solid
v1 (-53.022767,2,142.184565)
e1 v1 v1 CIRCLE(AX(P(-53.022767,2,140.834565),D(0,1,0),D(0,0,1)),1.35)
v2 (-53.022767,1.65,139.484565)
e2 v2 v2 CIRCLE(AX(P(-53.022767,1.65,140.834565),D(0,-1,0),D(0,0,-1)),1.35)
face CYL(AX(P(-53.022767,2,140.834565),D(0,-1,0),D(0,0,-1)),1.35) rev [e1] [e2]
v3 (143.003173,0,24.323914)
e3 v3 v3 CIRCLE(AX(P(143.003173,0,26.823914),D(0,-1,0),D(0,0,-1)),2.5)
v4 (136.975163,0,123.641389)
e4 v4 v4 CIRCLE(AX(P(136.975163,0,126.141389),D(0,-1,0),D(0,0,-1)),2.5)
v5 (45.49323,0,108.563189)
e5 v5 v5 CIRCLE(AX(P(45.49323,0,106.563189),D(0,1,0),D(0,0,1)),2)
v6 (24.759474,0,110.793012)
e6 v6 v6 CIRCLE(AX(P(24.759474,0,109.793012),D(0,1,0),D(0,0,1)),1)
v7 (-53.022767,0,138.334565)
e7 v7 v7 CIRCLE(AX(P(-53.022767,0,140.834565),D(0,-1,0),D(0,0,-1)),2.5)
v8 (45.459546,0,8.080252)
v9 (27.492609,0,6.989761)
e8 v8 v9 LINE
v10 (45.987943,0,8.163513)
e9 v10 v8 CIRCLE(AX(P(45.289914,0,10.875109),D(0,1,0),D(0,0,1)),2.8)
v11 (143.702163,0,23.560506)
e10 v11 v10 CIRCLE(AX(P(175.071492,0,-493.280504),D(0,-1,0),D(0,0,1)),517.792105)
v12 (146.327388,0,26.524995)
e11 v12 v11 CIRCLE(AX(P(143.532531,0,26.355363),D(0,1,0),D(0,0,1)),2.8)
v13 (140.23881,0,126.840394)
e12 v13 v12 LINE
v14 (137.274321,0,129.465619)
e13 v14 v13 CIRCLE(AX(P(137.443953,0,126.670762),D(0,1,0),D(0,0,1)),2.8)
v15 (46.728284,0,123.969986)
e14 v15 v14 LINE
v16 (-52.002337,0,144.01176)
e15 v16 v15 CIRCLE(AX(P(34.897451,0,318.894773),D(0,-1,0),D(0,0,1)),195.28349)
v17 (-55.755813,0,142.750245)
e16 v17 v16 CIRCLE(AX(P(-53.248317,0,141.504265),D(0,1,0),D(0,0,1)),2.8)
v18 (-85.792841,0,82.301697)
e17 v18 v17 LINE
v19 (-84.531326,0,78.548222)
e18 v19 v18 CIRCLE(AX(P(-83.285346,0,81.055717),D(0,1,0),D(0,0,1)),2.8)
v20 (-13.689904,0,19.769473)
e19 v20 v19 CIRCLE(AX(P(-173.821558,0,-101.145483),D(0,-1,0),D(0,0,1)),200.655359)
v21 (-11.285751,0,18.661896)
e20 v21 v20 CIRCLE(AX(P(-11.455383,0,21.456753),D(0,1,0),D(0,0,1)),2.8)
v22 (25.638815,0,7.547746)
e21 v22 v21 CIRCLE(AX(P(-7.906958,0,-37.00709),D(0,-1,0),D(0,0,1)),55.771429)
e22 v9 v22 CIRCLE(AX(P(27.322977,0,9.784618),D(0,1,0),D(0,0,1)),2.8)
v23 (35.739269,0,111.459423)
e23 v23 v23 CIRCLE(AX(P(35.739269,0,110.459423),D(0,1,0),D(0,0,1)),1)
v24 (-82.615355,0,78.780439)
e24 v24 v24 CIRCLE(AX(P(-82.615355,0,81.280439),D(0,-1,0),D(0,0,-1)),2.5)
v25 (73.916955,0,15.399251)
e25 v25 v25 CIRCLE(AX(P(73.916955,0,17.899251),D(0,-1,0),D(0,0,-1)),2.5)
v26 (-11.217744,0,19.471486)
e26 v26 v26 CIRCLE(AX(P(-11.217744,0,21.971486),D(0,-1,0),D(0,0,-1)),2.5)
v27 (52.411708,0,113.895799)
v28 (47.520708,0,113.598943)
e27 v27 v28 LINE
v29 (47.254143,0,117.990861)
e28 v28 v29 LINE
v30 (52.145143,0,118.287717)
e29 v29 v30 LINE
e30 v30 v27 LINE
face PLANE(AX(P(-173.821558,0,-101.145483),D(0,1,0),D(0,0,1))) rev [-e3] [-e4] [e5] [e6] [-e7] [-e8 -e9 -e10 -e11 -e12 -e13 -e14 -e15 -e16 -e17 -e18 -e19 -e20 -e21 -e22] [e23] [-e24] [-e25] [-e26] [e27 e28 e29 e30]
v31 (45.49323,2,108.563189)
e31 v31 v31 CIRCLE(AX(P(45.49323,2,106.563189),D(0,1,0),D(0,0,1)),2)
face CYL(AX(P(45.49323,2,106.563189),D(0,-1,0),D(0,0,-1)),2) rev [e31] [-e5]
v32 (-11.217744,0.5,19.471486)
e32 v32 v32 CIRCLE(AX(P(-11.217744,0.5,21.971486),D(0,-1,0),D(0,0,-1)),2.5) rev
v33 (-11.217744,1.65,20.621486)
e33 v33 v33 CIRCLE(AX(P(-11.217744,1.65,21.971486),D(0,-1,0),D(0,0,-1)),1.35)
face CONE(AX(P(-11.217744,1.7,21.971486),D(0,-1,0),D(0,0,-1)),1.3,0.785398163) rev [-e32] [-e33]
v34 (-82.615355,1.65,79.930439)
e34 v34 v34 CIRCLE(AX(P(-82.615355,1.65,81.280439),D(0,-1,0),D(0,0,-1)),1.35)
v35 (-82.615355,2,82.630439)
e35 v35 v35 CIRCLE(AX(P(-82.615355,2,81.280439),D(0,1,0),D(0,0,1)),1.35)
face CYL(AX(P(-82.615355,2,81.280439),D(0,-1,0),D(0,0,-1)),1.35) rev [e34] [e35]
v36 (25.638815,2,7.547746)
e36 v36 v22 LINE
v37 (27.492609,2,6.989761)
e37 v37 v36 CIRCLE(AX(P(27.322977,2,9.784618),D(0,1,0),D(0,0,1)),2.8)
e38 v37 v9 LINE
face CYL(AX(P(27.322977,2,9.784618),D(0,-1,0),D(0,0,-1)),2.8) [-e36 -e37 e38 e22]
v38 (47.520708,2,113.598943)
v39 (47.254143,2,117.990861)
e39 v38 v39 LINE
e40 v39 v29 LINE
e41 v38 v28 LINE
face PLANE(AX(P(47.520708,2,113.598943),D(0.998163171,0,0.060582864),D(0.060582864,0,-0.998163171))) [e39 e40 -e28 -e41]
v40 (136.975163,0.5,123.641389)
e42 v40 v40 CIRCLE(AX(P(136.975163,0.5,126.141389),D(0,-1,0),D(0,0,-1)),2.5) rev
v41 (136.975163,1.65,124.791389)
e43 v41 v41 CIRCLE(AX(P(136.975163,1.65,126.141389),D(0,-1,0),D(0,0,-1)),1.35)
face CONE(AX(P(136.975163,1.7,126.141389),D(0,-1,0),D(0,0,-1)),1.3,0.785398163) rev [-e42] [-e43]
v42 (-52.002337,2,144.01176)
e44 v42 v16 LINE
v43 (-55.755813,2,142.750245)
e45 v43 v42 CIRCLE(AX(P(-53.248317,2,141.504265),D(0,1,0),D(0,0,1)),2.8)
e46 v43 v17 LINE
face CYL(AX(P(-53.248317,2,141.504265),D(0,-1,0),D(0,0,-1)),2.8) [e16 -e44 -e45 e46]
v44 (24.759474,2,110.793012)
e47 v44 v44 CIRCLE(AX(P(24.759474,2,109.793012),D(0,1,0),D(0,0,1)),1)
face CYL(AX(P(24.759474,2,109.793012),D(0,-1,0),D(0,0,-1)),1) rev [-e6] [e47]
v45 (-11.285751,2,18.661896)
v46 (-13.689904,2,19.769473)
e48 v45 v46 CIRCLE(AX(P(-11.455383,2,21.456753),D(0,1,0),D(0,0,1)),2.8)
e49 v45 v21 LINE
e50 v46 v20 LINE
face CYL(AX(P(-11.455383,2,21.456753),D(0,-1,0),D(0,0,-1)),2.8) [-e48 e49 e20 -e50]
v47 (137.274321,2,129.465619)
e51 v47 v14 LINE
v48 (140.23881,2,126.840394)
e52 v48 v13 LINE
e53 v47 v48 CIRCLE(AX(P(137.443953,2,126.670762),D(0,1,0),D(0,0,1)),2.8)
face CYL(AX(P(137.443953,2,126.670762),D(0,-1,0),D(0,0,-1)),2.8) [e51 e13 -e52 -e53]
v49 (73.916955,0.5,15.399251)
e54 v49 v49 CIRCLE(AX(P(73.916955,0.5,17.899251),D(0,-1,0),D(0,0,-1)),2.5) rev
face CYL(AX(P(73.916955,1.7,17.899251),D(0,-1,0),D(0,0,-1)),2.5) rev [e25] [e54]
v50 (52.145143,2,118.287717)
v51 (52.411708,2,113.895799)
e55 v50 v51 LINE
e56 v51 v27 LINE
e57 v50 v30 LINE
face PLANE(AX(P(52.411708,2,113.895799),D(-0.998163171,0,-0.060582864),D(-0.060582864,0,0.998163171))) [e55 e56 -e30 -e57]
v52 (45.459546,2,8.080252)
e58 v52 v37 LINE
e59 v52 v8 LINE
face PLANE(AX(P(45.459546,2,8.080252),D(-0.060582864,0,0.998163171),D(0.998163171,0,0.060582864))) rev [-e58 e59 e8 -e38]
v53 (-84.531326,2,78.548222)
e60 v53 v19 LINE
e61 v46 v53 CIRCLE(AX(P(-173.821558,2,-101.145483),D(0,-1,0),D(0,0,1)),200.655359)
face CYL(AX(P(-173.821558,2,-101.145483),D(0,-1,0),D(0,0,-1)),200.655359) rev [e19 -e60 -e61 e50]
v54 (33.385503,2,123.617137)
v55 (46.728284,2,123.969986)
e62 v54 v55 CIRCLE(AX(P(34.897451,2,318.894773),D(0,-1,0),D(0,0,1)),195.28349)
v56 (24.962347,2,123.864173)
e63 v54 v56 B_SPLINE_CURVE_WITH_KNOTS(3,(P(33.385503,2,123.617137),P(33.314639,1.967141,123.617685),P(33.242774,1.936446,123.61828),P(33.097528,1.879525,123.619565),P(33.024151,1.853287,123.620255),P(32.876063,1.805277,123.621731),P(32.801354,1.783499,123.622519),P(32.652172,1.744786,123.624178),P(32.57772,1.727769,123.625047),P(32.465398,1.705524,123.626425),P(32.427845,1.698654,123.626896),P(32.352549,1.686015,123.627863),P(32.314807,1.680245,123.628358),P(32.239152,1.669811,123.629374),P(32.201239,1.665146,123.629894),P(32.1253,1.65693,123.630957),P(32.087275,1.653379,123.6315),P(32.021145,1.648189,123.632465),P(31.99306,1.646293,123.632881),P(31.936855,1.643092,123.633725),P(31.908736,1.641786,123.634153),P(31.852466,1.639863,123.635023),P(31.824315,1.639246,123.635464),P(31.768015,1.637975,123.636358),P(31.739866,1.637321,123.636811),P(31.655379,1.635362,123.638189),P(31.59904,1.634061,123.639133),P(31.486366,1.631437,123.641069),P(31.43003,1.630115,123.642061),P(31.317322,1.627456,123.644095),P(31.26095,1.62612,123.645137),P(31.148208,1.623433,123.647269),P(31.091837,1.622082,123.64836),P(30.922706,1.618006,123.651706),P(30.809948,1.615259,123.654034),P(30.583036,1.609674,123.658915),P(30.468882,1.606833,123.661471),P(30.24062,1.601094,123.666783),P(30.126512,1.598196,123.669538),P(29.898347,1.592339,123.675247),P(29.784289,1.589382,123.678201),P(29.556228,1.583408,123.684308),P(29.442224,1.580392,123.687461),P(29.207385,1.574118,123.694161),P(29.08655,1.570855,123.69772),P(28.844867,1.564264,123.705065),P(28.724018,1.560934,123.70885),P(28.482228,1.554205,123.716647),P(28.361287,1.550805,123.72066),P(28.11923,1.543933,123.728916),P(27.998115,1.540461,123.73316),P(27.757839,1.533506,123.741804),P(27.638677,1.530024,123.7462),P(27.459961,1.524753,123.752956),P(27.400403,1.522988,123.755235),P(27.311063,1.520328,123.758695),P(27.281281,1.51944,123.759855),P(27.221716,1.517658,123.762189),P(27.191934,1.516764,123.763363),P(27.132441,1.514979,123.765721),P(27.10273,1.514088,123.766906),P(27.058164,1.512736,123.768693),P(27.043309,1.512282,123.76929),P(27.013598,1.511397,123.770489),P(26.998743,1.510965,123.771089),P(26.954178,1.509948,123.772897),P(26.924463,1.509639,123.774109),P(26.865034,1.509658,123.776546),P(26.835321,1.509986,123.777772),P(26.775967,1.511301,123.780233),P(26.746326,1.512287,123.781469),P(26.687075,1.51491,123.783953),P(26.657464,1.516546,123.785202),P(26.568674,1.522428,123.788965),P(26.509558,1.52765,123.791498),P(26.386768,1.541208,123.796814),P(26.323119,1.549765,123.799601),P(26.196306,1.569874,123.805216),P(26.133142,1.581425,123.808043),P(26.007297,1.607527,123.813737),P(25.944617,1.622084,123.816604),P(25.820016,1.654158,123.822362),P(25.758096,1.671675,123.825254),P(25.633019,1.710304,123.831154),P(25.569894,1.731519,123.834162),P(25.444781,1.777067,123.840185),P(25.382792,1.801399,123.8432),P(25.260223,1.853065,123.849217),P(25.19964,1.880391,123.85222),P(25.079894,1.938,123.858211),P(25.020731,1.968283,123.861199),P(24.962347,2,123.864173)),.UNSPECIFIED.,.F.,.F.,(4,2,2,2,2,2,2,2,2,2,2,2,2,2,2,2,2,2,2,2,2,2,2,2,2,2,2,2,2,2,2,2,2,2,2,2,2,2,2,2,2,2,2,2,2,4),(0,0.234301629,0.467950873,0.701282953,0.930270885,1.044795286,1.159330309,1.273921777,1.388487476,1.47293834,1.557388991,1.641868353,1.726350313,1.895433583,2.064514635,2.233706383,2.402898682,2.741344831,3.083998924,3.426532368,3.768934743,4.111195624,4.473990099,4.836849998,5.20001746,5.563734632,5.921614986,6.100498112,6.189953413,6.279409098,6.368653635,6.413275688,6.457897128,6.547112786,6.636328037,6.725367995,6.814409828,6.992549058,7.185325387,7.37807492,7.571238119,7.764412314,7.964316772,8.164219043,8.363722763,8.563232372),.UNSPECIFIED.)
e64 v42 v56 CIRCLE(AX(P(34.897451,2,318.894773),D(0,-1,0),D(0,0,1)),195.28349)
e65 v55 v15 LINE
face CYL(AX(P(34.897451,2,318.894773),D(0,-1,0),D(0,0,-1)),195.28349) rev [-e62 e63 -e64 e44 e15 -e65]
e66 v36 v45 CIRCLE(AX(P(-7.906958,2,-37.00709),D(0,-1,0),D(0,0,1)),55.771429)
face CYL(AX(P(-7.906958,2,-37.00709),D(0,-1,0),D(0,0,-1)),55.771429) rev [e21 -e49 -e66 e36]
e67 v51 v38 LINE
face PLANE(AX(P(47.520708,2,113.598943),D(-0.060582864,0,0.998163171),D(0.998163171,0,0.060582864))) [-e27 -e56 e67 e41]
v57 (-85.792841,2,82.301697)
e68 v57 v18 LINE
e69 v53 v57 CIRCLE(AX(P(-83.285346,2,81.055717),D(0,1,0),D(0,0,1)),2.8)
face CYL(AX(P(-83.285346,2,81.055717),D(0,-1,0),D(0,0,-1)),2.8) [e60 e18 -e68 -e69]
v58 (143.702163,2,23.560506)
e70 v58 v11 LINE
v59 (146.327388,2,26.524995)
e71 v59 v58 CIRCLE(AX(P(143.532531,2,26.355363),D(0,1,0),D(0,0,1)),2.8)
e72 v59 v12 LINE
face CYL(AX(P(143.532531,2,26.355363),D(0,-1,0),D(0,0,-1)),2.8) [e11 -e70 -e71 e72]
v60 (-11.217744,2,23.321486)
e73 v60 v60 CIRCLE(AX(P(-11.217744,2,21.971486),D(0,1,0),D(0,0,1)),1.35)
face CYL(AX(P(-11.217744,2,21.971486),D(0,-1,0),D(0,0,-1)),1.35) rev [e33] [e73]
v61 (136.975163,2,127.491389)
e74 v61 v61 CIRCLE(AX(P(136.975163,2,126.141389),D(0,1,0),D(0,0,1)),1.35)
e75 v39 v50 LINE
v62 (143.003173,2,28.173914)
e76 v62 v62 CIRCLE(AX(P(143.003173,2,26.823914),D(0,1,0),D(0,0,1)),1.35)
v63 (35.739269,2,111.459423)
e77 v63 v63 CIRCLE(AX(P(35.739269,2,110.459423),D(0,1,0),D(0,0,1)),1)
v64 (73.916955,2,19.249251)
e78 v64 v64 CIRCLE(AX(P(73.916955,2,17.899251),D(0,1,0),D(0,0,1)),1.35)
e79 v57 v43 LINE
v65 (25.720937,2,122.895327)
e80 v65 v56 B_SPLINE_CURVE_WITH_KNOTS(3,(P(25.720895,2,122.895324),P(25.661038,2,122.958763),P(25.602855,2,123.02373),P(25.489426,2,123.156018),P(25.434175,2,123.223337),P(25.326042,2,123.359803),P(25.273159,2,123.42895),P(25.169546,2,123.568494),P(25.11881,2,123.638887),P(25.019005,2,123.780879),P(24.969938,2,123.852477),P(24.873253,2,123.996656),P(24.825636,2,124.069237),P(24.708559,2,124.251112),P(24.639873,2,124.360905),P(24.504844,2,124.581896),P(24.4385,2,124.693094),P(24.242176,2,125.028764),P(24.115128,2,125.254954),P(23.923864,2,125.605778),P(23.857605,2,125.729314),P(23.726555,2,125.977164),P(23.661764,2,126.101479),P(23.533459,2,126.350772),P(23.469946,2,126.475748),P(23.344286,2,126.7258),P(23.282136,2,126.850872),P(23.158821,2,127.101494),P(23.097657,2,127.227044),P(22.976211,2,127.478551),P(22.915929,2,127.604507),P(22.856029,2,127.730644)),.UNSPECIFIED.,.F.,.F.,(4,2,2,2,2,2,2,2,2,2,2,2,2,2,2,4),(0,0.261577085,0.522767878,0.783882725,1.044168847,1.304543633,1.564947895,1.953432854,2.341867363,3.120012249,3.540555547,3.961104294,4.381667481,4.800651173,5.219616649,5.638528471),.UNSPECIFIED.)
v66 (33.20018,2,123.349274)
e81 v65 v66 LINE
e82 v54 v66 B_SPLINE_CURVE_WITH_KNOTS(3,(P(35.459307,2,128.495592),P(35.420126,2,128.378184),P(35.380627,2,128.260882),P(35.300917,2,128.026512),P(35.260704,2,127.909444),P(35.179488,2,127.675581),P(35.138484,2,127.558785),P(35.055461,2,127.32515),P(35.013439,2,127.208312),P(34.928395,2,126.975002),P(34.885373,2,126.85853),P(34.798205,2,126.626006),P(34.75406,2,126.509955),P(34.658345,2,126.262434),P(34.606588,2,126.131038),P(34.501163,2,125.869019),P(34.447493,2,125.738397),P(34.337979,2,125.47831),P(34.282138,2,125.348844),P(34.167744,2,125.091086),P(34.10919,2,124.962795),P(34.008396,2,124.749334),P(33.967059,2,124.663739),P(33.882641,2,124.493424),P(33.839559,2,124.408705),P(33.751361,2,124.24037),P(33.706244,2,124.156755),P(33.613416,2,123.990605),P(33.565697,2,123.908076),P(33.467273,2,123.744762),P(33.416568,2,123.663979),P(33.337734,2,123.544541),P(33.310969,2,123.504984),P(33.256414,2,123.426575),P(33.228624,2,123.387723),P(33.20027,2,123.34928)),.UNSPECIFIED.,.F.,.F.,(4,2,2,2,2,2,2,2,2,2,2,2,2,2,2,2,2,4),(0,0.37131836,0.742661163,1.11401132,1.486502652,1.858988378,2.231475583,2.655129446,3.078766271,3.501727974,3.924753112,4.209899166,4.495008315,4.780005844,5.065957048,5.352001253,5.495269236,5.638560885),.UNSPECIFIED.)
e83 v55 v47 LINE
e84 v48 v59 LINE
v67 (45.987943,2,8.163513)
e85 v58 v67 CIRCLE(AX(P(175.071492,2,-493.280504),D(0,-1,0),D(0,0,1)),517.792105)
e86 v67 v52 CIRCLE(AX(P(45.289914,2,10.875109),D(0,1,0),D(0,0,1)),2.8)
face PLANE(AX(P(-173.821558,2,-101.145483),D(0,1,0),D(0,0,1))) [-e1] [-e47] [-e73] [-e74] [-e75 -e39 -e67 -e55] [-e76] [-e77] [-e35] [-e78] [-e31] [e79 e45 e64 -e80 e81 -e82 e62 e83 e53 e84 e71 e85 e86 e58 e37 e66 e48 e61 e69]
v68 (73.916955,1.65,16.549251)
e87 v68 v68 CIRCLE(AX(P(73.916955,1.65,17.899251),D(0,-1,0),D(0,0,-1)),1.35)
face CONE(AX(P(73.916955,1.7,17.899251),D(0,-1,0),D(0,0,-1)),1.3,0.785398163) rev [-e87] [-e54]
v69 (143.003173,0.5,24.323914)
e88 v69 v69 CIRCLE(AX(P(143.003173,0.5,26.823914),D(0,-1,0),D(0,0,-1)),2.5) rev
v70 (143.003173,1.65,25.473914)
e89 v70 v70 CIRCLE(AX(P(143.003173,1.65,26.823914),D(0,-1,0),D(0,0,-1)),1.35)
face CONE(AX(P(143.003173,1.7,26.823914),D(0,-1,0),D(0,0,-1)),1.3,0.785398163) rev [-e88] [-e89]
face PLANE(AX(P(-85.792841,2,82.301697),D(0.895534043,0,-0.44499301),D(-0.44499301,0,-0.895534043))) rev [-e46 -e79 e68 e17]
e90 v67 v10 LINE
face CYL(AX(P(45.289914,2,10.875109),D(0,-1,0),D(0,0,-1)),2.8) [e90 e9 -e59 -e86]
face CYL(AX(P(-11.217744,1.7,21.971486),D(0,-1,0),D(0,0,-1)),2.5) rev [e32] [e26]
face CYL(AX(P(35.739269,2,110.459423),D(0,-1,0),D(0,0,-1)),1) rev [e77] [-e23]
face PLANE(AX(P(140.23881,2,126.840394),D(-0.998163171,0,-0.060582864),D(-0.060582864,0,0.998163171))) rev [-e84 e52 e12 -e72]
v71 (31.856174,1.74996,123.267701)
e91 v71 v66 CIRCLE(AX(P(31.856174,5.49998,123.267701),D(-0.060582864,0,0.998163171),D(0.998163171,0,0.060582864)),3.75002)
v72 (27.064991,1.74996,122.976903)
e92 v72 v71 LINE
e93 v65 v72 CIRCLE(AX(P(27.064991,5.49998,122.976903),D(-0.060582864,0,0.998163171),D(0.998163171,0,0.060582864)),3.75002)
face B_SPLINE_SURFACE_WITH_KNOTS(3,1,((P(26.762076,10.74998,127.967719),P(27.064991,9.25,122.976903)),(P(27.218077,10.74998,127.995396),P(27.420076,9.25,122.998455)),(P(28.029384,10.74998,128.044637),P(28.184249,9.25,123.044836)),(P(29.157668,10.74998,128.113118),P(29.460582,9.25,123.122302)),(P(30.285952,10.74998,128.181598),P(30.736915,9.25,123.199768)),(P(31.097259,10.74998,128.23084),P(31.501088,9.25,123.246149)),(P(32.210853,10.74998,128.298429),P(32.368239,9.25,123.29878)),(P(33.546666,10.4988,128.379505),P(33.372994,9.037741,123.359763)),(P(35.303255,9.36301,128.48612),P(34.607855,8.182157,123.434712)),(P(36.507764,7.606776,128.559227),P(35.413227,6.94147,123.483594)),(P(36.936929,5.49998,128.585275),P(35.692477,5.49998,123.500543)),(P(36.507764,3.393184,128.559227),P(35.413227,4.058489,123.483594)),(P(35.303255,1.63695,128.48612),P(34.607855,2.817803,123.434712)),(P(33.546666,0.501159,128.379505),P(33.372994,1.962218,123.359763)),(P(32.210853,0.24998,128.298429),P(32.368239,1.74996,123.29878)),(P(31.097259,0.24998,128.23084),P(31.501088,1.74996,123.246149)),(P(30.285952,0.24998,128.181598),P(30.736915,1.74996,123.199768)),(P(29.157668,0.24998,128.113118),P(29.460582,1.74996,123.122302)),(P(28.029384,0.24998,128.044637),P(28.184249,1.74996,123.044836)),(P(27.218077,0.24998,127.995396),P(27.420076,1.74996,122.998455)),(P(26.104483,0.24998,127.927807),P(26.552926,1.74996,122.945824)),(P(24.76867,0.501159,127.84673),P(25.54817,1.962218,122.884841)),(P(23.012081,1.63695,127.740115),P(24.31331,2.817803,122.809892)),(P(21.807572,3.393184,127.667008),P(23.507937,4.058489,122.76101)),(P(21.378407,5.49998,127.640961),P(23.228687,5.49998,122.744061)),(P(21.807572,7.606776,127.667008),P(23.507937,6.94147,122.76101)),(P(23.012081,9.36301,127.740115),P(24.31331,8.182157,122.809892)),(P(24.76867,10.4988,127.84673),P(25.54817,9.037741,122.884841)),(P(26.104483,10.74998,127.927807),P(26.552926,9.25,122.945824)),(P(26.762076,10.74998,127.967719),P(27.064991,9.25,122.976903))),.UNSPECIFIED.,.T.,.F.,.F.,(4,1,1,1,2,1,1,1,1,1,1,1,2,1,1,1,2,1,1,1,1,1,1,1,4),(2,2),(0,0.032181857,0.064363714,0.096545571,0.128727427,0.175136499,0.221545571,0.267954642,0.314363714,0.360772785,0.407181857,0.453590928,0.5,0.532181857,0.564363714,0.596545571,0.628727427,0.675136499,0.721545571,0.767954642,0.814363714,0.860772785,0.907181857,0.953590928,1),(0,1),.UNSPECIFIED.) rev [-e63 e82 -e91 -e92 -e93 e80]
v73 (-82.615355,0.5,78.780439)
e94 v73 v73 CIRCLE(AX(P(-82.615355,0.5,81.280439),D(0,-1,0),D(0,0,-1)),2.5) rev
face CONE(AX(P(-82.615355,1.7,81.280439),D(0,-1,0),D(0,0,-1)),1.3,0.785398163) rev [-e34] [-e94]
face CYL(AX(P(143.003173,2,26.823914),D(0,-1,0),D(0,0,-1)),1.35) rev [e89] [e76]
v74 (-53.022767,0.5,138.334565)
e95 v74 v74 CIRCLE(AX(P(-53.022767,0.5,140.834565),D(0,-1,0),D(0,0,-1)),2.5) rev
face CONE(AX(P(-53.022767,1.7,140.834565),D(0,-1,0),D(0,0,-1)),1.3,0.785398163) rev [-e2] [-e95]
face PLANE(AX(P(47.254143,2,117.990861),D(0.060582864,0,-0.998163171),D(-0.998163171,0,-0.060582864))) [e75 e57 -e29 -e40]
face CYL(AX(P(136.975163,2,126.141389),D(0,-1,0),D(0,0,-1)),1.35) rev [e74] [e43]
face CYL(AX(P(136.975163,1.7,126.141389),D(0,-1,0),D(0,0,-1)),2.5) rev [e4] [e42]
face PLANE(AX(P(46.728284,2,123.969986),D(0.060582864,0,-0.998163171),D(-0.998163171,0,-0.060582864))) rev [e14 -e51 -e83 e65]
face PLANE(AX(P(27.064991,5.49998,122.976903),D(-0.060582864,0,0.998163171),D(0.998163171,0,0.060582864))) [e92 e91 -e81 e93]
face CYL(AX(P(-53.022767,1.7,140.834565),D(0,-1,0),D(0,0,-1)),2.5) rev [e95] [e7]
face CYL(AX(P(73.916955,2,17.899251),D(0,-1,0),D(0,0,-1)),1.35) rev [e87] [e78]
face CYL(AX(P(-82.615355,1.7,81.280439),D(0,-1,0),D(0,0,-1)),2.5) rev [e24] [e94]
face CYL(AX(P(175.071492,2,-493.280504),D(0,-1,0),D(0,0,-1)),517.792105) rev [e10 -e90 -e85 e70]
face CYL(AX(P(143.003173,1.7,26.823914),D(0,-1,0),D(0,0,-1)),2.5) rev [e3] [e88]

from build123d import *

# Parameters (mm, degrees)
SKETCH1_R                = 1
SKETCH1_R_2              = 2
SKETCH1_R_3              = 1.35
MAIN_PLATE_DEPTH         = 2
SKETCH2_R                = 2.5
SCREW_HOLES_DEPTH        = 1.7
SCREW_HOLES_CHAMFER_SIZE = 1.2


with BuildPart() as part:
    # Sketch1 → Main_plate (new body)
    with BuildSketch(Plane(origin=(0, 0, 0), x_dir=(1, 0, 0), z_dir=(0, 1, 0))):
        with BuildLine():
            Line((-85.7928409, -82.301697444), (-55.755812757, -142.75024532))
            ThreePointArc((-55.755812757, -142.75024532), (-54.140343173, -144.158373046), (-52.002337011, -144.011760212))
            ThreePointArc((-52.002337011, -144.011760212), (-3.951682628, -127.514559525), (46.728283967, -123.969985789))
            Line((46.728283967, -123.969985789), (137.274321343, -129.465618584))
            ThreePointArc((137.274321343, -129.465618584), (139.300267663, -128.766971907), (140.238810242, -126.840393723))
            Line((140.238810242, -126.840393723), (146.327388064, -26.524995005))
            ThreePointArc((146.327388064, -26.524995005), (145.628741387, -24.499048684), (143.702163203, -23.560506106))
            ThreePointArc((143.702163203, -23.560506106), (94.476527457, -18.20079206), (45.987943487, -8.163512858))
            ThreePointArc((45.987943487, -8.163512858), (45.725737799, -8.109235511), (45.459546448, -8.080252452))
            Line((45.459546448, -8.080252452), (27.492609364, -6.989760902))
            ThreePointArc((27.492609364, -6.989760902), (26.515953382, -7.103440368), (25.638814565, -7.547745919))
            ThreePointArc((25.638814565, -7.547745919), (8.167641381, -16.397587105), (-11.285751241, -18.661896472))
            ThreePointArc((-11.285751241, -18.661896472), (-12.626973233, -18.913649552), (-13.689904343, -19.76947284))
            ThreePointArc((-13.689904343, -19.76947284), (-45.694454746, -53.276077835), (-84.531326007, -78.548221698))
            ThreePointArc((-84.531326007, -78.548221698), (-85.939453733, -80.163691282), (-85.7928409, -82.301697444))
        make_face()
        with Locations(Location((24.759473712, -109.793011675, 0), (0, 0, 270))):
            Circle(SKETCH1_R, mode=Mode.SUBTRACT)
        with Locations(Location((35.739268597, -110.459423178, 0), (0, 0, 270))):
            Circle(SKETCH1_R, mode=Mode.SUBTRACT)
        with Locations(Location((45.493229955, -106.563189377, 0), (0, 0, 270))):
            Circle(SKETCH1_R_2, mode=Mode.SUBTRACT)
        with Locations(Location((143.003172699, -26.823913699, 0), (0, 0, 270))):
            Circle(SKETCH1_R_3, mode=Mode.SUBTRACT)
        with Locations(Location((73.916954773, -17.899251104, 0), (0, 0, 270))):
            Circle(SKETCH1_R_3, mode=Mode.SUBTRACT)
        with Locations(Location((-11.217743895, -21.971485999, 0), (0, 0, 270))):
            Circle(SKETCH1_R_3, mode=Mode.SUBTRACT)
        with Locations(Location((-82.615354782, -81.280438678, 0), (0, 0, 270))):
            Circle(SKETCH1_R_3, mode=Mode.SUBTRACT)
        with Locations(Location((-53.022766816, -140.834565069, 0), (0, 0, 270))):
            Circle(SKETCH1_R_3, mode=Mode.SUBTRACT)
        with Locations(Location((136.975163208, -126.141388687, 0), (0, 0, 270))):
            Circle(SKETCH1_R_3, mode=Mode.SUBTRACT)
        Polygon((47.520707964, -113.598943276), (52.411707503, -113.895799309), (52.145142902, -118.287717263), (47.254143363, -117.99086123), align=None, mode=Mode.SUBTRACT)
    extrude(amount=MAIN_PLATE_DEPTH)

    # Sketch2 → Screw_holes (cut)
    with BuildSketch(Plane.XZ):
        with Locations(Location((136.975163208, 126.141388687, 0), (0, 0, 270))):
            Circle(SKETCH2_R)
        with Locations(Location((-53.022766816, 140.834565069, 0), (0, 0, 270))):
            Circle(SKETCH2_R)
        with Locations(Location((-82.615354782, 81.280438678, 0), (0, 0, 270))):
            Circle(SKETCH2_R)
        with Locations(Location((-11.217743895, 21.971485999, 0), (0, 0, 270))):
            Circle(SKETCH2_R)
        with Locations(Location((73.916954773, 17.899251104, 0), (0, 0, 270))):
            Circle(SKETCH2_R)
        with Locations(Location((143.003172699, 26.823913699, 0), (0, 0, 270))):
            Circle(SKETCH2_R)
    extrude(amount=-SCREW_HOLES_DEPTH, mode=Mode.SUBTRACT)

    # Screw_holes_chamfer
    # the kernel refuses this chamfer: 1.2 mm, written as the material it adds along each edge
    with BuildSketch(Plane(origin=(143.003172699, 1.7, 26.823913699), x_dir=(0, 0, -1), z_dir=(-1, 0, 0))) as screw_holes_chamfer_piece_1_section:
        Polygon((2.5, SCREW_HOLES_CHAMFER_SIZE), (2.5 - SCREW_HOLES_CHAMFER_SIZE, 0), (2.5, 0), align=None)
    screw_holes_chamfer_piece_1 = revolve(axis=Axis((143.003172699, 1.7, 26.823913699), (0, -1, 0)), mode=Mode.PRIVATE)
    screw_holes_chamfer_piece_1 = screw_holes_chamfer_piece_1 - Plane(origin=(143.003172699, 1.073479929, 26.823913699), x_dir=(0, 0, 1), z_dir=(0, -1, 0)) * Cylinder(1.35, 10, mode=Mode.PRIVATE)
    add(screw_holes_chamfer_piece_1)
    with BuildSketch(Plane(origin=(73.916954773, 1.7, 17.899251104), x_dir=(0, 0, -1), z_dir=(-1, 0, 0))) as screw_holes_chamfer_piece_2_section:
        Polygon((2.5, SCREW_HOLES_CHAMFER_SIZE), (2.5 - SCREW_HOLES_CHAMFER_SIZE, 0), (2.5, 0), align=None)
    screw_holes_chamfer_piece_2 = revolve(axis=Axis((73.916954773, 1.7, 17.899251104), (0, -1, 0)), mode=Mode.PRIVATE)
    screw_holes_chamfer_piece_2 = screw_holes_chamfer_piece_2 - Plane(origin=(73.916954773, 1.073479929, 17.899251104), x_dir=(0, 0, 1), z_dir=(0, -1, 0)) * Cylinder(1.35, 10, mode=Mode.PRIVATE)
    add(screw_holes_chamfer_piece_2)
    with BuildSketch(Plane(origin=(-11.217743895, 1.7, 21.971485999), x_dir=(0, 0, -1), z_dir=(-1, 0, 0))) as screw_holes_chamfer_piece_3_section:
        Polygon((2.5, SCREW_HOLES_CHAMFER_SIZE), (2.5 - SCREW_HOLES_CHAMFER_SIZE, 0), (2.5, 0), align=None)
    screw_holes_chamfer_piece_3 = revolve(axis=Axis((-11.217743895, 1.7, 21.971485999), (0, -1, 0)), mode=Mode.PRIVATE)
    screw_holes_chamfer_piece_3 = screw_holes_chamfer_piece_3 - Plane(origin=(-11.217743895, 1.073479929, 21.971485999), x_dir=(0, 0, 1), z_dir=(0, -1, 0)) * Cylinder(1.35, 10, mode=Mode.PRIVATE)
    add(screw_holes_chamfer_piece_3)
    with BuildSketch(Plane(origin=(-82.615354782, 1.7, 81.280438678), x_dir=(0, 0, -1), z_dir=(-1, 0, 0))) as screw_holes_chamfer_piece_4_section:
        Polygon((2.5, SCREW_HOLES_CHAMFER_SIZE), (2.5 - SCREW_HOLES_CHAMFER_SIZE, 0), (2.5, 0), align=None)
    screw_holes_chamfer_piece_4 = revolve(axis=Axis((-82.615354782, 1.7, 81.280438678), (0, -1, 0)), mode=Mode.PRIVATE)
    screw_holes_chamfer_piece_4 = screw_holes_chamfer_piece_4 - Plane(origin=(-82.615354782, 1.073479929, 81.280438678), x_dir=(0, 0, 1), z_dir=(0, -1, 0)) * Cylinder(1.35, 11, mode=Mode.PRIVATE)
    add(screw_holes_chamfer_piece_4)
    with BuildSketch(Plane(origin=(-53.022766816, 1.7, 140.834565069), x_dir=(0, 0, -1), z_dir=(-1, 0, 0))) as screw_holes_chamfer_piece_5_section:
        Polygon((2.5, SCREW_HOLES_CHAMFER_SIZE), (2.5 - SCREW_HOLES_CHAMFER_SIZE, 0), (2.5, 0), align=None)
    screw_holes_chamfer_piece_5 = revolve(axis=Axis((-53.022766816, 1.7, 140.834565069), (0, -1, 0)), mode=Mode.PRIVATE)
    screw_holes_chamfer_piece_5 = screw_holes_chamfer_piece_5 - Plane(origin=(-53.022766816, 1.073479929, 140.834565069), x_dir=(0, 0, 1), z_dir=(0, -1, 0)) * Cylinder(1.35, 10, mode=Mode.PRIVATE)
    add(screw_holes_chamfer_piece_5)
    with BuildSketch(Plane(origin=(136.975163208, 1.7, 126.141388687), x_dir=(0, 0, -1), z_dir=(-1, 0, 0))) as screw_holes_chamfer_piece_6_section:
        Polygon((2.5, SCREW_HOLES_CHAMFER_SIZE), (2.5 - SCREW_HOLES_CHAMFER_SIZE, 0), (2.5, 0), align=None)
    screw_holes_chamfer_piece_6 = revolve(axis=Axis((136.975163208, 1.7, 126.141388687), (0, -1, 0)), mode=Mode.PRIVATE)
    screw_holes_chamfer_piece_6 = screw_holes_chamfer_piece_6 - Plane(origin=(136.975163208, 1.073479929, 126.141388687), x_dir=(0, 0, 1), z_dir=(0, -1, 0)) * Cylinder(1.35, 10, mode=Mode.PRIVATE)
    add(screw_holes_chamfer_piece_6)

    # Sketch4 → Cut-Loft1 section 0
    with BuildSketch(Plane(origin=(-7.640186202, 0, 125.879695971), x_dir=(0.9981631713309721, 0, 0.060582863901407005), z_dir=(-0.060582863901407005, 0, 0.9981631713309721))):
        with BuildLine():
            Line((34.465569885, 10.749979768), (39.265569885, 10.749979768))
            ThreePointArc((39.265569885, 10.749979768), (44.515569885, 5.499979768), (39.265569885, 0.249979768))
            Line((39.265569885, 0.249979768), (34.465569885, 0.249979768))
            ThreePointArc((34.465569885, 0.249979768), (29.215569885, 5.499979768), (34.465569885, 10.749979768))
        make_face()
    # Sketch3 → Cut-Loft1 section 1
    with BuildSketch(Plane(origin=(-7.337271882, 0, 120.888880114), x_dir=(0.9981631713309721, 0, 0.060582863901407005), z_dir=(-0.060582863901407005, 0, 0.9981631713309721))):
        with BuildLine():
            Line((34.465569885, 9.25), (39.265569885, 9.25))
            ThreePointArc((39.265569885, 9.25), (43.015590117, 5.499979768), (39.265569885, 1.749959536))
            Line((39.265569885, 1.749959536), (34.465569885, 1.749959536))
            ThreePointArc((34.465569885, 1.749959536), (30.715549653, 5.499979768), (34.465569885, 9.25))
        make_face()
    loft(mode=Mode.SUBTRACT)


solid = part.part
